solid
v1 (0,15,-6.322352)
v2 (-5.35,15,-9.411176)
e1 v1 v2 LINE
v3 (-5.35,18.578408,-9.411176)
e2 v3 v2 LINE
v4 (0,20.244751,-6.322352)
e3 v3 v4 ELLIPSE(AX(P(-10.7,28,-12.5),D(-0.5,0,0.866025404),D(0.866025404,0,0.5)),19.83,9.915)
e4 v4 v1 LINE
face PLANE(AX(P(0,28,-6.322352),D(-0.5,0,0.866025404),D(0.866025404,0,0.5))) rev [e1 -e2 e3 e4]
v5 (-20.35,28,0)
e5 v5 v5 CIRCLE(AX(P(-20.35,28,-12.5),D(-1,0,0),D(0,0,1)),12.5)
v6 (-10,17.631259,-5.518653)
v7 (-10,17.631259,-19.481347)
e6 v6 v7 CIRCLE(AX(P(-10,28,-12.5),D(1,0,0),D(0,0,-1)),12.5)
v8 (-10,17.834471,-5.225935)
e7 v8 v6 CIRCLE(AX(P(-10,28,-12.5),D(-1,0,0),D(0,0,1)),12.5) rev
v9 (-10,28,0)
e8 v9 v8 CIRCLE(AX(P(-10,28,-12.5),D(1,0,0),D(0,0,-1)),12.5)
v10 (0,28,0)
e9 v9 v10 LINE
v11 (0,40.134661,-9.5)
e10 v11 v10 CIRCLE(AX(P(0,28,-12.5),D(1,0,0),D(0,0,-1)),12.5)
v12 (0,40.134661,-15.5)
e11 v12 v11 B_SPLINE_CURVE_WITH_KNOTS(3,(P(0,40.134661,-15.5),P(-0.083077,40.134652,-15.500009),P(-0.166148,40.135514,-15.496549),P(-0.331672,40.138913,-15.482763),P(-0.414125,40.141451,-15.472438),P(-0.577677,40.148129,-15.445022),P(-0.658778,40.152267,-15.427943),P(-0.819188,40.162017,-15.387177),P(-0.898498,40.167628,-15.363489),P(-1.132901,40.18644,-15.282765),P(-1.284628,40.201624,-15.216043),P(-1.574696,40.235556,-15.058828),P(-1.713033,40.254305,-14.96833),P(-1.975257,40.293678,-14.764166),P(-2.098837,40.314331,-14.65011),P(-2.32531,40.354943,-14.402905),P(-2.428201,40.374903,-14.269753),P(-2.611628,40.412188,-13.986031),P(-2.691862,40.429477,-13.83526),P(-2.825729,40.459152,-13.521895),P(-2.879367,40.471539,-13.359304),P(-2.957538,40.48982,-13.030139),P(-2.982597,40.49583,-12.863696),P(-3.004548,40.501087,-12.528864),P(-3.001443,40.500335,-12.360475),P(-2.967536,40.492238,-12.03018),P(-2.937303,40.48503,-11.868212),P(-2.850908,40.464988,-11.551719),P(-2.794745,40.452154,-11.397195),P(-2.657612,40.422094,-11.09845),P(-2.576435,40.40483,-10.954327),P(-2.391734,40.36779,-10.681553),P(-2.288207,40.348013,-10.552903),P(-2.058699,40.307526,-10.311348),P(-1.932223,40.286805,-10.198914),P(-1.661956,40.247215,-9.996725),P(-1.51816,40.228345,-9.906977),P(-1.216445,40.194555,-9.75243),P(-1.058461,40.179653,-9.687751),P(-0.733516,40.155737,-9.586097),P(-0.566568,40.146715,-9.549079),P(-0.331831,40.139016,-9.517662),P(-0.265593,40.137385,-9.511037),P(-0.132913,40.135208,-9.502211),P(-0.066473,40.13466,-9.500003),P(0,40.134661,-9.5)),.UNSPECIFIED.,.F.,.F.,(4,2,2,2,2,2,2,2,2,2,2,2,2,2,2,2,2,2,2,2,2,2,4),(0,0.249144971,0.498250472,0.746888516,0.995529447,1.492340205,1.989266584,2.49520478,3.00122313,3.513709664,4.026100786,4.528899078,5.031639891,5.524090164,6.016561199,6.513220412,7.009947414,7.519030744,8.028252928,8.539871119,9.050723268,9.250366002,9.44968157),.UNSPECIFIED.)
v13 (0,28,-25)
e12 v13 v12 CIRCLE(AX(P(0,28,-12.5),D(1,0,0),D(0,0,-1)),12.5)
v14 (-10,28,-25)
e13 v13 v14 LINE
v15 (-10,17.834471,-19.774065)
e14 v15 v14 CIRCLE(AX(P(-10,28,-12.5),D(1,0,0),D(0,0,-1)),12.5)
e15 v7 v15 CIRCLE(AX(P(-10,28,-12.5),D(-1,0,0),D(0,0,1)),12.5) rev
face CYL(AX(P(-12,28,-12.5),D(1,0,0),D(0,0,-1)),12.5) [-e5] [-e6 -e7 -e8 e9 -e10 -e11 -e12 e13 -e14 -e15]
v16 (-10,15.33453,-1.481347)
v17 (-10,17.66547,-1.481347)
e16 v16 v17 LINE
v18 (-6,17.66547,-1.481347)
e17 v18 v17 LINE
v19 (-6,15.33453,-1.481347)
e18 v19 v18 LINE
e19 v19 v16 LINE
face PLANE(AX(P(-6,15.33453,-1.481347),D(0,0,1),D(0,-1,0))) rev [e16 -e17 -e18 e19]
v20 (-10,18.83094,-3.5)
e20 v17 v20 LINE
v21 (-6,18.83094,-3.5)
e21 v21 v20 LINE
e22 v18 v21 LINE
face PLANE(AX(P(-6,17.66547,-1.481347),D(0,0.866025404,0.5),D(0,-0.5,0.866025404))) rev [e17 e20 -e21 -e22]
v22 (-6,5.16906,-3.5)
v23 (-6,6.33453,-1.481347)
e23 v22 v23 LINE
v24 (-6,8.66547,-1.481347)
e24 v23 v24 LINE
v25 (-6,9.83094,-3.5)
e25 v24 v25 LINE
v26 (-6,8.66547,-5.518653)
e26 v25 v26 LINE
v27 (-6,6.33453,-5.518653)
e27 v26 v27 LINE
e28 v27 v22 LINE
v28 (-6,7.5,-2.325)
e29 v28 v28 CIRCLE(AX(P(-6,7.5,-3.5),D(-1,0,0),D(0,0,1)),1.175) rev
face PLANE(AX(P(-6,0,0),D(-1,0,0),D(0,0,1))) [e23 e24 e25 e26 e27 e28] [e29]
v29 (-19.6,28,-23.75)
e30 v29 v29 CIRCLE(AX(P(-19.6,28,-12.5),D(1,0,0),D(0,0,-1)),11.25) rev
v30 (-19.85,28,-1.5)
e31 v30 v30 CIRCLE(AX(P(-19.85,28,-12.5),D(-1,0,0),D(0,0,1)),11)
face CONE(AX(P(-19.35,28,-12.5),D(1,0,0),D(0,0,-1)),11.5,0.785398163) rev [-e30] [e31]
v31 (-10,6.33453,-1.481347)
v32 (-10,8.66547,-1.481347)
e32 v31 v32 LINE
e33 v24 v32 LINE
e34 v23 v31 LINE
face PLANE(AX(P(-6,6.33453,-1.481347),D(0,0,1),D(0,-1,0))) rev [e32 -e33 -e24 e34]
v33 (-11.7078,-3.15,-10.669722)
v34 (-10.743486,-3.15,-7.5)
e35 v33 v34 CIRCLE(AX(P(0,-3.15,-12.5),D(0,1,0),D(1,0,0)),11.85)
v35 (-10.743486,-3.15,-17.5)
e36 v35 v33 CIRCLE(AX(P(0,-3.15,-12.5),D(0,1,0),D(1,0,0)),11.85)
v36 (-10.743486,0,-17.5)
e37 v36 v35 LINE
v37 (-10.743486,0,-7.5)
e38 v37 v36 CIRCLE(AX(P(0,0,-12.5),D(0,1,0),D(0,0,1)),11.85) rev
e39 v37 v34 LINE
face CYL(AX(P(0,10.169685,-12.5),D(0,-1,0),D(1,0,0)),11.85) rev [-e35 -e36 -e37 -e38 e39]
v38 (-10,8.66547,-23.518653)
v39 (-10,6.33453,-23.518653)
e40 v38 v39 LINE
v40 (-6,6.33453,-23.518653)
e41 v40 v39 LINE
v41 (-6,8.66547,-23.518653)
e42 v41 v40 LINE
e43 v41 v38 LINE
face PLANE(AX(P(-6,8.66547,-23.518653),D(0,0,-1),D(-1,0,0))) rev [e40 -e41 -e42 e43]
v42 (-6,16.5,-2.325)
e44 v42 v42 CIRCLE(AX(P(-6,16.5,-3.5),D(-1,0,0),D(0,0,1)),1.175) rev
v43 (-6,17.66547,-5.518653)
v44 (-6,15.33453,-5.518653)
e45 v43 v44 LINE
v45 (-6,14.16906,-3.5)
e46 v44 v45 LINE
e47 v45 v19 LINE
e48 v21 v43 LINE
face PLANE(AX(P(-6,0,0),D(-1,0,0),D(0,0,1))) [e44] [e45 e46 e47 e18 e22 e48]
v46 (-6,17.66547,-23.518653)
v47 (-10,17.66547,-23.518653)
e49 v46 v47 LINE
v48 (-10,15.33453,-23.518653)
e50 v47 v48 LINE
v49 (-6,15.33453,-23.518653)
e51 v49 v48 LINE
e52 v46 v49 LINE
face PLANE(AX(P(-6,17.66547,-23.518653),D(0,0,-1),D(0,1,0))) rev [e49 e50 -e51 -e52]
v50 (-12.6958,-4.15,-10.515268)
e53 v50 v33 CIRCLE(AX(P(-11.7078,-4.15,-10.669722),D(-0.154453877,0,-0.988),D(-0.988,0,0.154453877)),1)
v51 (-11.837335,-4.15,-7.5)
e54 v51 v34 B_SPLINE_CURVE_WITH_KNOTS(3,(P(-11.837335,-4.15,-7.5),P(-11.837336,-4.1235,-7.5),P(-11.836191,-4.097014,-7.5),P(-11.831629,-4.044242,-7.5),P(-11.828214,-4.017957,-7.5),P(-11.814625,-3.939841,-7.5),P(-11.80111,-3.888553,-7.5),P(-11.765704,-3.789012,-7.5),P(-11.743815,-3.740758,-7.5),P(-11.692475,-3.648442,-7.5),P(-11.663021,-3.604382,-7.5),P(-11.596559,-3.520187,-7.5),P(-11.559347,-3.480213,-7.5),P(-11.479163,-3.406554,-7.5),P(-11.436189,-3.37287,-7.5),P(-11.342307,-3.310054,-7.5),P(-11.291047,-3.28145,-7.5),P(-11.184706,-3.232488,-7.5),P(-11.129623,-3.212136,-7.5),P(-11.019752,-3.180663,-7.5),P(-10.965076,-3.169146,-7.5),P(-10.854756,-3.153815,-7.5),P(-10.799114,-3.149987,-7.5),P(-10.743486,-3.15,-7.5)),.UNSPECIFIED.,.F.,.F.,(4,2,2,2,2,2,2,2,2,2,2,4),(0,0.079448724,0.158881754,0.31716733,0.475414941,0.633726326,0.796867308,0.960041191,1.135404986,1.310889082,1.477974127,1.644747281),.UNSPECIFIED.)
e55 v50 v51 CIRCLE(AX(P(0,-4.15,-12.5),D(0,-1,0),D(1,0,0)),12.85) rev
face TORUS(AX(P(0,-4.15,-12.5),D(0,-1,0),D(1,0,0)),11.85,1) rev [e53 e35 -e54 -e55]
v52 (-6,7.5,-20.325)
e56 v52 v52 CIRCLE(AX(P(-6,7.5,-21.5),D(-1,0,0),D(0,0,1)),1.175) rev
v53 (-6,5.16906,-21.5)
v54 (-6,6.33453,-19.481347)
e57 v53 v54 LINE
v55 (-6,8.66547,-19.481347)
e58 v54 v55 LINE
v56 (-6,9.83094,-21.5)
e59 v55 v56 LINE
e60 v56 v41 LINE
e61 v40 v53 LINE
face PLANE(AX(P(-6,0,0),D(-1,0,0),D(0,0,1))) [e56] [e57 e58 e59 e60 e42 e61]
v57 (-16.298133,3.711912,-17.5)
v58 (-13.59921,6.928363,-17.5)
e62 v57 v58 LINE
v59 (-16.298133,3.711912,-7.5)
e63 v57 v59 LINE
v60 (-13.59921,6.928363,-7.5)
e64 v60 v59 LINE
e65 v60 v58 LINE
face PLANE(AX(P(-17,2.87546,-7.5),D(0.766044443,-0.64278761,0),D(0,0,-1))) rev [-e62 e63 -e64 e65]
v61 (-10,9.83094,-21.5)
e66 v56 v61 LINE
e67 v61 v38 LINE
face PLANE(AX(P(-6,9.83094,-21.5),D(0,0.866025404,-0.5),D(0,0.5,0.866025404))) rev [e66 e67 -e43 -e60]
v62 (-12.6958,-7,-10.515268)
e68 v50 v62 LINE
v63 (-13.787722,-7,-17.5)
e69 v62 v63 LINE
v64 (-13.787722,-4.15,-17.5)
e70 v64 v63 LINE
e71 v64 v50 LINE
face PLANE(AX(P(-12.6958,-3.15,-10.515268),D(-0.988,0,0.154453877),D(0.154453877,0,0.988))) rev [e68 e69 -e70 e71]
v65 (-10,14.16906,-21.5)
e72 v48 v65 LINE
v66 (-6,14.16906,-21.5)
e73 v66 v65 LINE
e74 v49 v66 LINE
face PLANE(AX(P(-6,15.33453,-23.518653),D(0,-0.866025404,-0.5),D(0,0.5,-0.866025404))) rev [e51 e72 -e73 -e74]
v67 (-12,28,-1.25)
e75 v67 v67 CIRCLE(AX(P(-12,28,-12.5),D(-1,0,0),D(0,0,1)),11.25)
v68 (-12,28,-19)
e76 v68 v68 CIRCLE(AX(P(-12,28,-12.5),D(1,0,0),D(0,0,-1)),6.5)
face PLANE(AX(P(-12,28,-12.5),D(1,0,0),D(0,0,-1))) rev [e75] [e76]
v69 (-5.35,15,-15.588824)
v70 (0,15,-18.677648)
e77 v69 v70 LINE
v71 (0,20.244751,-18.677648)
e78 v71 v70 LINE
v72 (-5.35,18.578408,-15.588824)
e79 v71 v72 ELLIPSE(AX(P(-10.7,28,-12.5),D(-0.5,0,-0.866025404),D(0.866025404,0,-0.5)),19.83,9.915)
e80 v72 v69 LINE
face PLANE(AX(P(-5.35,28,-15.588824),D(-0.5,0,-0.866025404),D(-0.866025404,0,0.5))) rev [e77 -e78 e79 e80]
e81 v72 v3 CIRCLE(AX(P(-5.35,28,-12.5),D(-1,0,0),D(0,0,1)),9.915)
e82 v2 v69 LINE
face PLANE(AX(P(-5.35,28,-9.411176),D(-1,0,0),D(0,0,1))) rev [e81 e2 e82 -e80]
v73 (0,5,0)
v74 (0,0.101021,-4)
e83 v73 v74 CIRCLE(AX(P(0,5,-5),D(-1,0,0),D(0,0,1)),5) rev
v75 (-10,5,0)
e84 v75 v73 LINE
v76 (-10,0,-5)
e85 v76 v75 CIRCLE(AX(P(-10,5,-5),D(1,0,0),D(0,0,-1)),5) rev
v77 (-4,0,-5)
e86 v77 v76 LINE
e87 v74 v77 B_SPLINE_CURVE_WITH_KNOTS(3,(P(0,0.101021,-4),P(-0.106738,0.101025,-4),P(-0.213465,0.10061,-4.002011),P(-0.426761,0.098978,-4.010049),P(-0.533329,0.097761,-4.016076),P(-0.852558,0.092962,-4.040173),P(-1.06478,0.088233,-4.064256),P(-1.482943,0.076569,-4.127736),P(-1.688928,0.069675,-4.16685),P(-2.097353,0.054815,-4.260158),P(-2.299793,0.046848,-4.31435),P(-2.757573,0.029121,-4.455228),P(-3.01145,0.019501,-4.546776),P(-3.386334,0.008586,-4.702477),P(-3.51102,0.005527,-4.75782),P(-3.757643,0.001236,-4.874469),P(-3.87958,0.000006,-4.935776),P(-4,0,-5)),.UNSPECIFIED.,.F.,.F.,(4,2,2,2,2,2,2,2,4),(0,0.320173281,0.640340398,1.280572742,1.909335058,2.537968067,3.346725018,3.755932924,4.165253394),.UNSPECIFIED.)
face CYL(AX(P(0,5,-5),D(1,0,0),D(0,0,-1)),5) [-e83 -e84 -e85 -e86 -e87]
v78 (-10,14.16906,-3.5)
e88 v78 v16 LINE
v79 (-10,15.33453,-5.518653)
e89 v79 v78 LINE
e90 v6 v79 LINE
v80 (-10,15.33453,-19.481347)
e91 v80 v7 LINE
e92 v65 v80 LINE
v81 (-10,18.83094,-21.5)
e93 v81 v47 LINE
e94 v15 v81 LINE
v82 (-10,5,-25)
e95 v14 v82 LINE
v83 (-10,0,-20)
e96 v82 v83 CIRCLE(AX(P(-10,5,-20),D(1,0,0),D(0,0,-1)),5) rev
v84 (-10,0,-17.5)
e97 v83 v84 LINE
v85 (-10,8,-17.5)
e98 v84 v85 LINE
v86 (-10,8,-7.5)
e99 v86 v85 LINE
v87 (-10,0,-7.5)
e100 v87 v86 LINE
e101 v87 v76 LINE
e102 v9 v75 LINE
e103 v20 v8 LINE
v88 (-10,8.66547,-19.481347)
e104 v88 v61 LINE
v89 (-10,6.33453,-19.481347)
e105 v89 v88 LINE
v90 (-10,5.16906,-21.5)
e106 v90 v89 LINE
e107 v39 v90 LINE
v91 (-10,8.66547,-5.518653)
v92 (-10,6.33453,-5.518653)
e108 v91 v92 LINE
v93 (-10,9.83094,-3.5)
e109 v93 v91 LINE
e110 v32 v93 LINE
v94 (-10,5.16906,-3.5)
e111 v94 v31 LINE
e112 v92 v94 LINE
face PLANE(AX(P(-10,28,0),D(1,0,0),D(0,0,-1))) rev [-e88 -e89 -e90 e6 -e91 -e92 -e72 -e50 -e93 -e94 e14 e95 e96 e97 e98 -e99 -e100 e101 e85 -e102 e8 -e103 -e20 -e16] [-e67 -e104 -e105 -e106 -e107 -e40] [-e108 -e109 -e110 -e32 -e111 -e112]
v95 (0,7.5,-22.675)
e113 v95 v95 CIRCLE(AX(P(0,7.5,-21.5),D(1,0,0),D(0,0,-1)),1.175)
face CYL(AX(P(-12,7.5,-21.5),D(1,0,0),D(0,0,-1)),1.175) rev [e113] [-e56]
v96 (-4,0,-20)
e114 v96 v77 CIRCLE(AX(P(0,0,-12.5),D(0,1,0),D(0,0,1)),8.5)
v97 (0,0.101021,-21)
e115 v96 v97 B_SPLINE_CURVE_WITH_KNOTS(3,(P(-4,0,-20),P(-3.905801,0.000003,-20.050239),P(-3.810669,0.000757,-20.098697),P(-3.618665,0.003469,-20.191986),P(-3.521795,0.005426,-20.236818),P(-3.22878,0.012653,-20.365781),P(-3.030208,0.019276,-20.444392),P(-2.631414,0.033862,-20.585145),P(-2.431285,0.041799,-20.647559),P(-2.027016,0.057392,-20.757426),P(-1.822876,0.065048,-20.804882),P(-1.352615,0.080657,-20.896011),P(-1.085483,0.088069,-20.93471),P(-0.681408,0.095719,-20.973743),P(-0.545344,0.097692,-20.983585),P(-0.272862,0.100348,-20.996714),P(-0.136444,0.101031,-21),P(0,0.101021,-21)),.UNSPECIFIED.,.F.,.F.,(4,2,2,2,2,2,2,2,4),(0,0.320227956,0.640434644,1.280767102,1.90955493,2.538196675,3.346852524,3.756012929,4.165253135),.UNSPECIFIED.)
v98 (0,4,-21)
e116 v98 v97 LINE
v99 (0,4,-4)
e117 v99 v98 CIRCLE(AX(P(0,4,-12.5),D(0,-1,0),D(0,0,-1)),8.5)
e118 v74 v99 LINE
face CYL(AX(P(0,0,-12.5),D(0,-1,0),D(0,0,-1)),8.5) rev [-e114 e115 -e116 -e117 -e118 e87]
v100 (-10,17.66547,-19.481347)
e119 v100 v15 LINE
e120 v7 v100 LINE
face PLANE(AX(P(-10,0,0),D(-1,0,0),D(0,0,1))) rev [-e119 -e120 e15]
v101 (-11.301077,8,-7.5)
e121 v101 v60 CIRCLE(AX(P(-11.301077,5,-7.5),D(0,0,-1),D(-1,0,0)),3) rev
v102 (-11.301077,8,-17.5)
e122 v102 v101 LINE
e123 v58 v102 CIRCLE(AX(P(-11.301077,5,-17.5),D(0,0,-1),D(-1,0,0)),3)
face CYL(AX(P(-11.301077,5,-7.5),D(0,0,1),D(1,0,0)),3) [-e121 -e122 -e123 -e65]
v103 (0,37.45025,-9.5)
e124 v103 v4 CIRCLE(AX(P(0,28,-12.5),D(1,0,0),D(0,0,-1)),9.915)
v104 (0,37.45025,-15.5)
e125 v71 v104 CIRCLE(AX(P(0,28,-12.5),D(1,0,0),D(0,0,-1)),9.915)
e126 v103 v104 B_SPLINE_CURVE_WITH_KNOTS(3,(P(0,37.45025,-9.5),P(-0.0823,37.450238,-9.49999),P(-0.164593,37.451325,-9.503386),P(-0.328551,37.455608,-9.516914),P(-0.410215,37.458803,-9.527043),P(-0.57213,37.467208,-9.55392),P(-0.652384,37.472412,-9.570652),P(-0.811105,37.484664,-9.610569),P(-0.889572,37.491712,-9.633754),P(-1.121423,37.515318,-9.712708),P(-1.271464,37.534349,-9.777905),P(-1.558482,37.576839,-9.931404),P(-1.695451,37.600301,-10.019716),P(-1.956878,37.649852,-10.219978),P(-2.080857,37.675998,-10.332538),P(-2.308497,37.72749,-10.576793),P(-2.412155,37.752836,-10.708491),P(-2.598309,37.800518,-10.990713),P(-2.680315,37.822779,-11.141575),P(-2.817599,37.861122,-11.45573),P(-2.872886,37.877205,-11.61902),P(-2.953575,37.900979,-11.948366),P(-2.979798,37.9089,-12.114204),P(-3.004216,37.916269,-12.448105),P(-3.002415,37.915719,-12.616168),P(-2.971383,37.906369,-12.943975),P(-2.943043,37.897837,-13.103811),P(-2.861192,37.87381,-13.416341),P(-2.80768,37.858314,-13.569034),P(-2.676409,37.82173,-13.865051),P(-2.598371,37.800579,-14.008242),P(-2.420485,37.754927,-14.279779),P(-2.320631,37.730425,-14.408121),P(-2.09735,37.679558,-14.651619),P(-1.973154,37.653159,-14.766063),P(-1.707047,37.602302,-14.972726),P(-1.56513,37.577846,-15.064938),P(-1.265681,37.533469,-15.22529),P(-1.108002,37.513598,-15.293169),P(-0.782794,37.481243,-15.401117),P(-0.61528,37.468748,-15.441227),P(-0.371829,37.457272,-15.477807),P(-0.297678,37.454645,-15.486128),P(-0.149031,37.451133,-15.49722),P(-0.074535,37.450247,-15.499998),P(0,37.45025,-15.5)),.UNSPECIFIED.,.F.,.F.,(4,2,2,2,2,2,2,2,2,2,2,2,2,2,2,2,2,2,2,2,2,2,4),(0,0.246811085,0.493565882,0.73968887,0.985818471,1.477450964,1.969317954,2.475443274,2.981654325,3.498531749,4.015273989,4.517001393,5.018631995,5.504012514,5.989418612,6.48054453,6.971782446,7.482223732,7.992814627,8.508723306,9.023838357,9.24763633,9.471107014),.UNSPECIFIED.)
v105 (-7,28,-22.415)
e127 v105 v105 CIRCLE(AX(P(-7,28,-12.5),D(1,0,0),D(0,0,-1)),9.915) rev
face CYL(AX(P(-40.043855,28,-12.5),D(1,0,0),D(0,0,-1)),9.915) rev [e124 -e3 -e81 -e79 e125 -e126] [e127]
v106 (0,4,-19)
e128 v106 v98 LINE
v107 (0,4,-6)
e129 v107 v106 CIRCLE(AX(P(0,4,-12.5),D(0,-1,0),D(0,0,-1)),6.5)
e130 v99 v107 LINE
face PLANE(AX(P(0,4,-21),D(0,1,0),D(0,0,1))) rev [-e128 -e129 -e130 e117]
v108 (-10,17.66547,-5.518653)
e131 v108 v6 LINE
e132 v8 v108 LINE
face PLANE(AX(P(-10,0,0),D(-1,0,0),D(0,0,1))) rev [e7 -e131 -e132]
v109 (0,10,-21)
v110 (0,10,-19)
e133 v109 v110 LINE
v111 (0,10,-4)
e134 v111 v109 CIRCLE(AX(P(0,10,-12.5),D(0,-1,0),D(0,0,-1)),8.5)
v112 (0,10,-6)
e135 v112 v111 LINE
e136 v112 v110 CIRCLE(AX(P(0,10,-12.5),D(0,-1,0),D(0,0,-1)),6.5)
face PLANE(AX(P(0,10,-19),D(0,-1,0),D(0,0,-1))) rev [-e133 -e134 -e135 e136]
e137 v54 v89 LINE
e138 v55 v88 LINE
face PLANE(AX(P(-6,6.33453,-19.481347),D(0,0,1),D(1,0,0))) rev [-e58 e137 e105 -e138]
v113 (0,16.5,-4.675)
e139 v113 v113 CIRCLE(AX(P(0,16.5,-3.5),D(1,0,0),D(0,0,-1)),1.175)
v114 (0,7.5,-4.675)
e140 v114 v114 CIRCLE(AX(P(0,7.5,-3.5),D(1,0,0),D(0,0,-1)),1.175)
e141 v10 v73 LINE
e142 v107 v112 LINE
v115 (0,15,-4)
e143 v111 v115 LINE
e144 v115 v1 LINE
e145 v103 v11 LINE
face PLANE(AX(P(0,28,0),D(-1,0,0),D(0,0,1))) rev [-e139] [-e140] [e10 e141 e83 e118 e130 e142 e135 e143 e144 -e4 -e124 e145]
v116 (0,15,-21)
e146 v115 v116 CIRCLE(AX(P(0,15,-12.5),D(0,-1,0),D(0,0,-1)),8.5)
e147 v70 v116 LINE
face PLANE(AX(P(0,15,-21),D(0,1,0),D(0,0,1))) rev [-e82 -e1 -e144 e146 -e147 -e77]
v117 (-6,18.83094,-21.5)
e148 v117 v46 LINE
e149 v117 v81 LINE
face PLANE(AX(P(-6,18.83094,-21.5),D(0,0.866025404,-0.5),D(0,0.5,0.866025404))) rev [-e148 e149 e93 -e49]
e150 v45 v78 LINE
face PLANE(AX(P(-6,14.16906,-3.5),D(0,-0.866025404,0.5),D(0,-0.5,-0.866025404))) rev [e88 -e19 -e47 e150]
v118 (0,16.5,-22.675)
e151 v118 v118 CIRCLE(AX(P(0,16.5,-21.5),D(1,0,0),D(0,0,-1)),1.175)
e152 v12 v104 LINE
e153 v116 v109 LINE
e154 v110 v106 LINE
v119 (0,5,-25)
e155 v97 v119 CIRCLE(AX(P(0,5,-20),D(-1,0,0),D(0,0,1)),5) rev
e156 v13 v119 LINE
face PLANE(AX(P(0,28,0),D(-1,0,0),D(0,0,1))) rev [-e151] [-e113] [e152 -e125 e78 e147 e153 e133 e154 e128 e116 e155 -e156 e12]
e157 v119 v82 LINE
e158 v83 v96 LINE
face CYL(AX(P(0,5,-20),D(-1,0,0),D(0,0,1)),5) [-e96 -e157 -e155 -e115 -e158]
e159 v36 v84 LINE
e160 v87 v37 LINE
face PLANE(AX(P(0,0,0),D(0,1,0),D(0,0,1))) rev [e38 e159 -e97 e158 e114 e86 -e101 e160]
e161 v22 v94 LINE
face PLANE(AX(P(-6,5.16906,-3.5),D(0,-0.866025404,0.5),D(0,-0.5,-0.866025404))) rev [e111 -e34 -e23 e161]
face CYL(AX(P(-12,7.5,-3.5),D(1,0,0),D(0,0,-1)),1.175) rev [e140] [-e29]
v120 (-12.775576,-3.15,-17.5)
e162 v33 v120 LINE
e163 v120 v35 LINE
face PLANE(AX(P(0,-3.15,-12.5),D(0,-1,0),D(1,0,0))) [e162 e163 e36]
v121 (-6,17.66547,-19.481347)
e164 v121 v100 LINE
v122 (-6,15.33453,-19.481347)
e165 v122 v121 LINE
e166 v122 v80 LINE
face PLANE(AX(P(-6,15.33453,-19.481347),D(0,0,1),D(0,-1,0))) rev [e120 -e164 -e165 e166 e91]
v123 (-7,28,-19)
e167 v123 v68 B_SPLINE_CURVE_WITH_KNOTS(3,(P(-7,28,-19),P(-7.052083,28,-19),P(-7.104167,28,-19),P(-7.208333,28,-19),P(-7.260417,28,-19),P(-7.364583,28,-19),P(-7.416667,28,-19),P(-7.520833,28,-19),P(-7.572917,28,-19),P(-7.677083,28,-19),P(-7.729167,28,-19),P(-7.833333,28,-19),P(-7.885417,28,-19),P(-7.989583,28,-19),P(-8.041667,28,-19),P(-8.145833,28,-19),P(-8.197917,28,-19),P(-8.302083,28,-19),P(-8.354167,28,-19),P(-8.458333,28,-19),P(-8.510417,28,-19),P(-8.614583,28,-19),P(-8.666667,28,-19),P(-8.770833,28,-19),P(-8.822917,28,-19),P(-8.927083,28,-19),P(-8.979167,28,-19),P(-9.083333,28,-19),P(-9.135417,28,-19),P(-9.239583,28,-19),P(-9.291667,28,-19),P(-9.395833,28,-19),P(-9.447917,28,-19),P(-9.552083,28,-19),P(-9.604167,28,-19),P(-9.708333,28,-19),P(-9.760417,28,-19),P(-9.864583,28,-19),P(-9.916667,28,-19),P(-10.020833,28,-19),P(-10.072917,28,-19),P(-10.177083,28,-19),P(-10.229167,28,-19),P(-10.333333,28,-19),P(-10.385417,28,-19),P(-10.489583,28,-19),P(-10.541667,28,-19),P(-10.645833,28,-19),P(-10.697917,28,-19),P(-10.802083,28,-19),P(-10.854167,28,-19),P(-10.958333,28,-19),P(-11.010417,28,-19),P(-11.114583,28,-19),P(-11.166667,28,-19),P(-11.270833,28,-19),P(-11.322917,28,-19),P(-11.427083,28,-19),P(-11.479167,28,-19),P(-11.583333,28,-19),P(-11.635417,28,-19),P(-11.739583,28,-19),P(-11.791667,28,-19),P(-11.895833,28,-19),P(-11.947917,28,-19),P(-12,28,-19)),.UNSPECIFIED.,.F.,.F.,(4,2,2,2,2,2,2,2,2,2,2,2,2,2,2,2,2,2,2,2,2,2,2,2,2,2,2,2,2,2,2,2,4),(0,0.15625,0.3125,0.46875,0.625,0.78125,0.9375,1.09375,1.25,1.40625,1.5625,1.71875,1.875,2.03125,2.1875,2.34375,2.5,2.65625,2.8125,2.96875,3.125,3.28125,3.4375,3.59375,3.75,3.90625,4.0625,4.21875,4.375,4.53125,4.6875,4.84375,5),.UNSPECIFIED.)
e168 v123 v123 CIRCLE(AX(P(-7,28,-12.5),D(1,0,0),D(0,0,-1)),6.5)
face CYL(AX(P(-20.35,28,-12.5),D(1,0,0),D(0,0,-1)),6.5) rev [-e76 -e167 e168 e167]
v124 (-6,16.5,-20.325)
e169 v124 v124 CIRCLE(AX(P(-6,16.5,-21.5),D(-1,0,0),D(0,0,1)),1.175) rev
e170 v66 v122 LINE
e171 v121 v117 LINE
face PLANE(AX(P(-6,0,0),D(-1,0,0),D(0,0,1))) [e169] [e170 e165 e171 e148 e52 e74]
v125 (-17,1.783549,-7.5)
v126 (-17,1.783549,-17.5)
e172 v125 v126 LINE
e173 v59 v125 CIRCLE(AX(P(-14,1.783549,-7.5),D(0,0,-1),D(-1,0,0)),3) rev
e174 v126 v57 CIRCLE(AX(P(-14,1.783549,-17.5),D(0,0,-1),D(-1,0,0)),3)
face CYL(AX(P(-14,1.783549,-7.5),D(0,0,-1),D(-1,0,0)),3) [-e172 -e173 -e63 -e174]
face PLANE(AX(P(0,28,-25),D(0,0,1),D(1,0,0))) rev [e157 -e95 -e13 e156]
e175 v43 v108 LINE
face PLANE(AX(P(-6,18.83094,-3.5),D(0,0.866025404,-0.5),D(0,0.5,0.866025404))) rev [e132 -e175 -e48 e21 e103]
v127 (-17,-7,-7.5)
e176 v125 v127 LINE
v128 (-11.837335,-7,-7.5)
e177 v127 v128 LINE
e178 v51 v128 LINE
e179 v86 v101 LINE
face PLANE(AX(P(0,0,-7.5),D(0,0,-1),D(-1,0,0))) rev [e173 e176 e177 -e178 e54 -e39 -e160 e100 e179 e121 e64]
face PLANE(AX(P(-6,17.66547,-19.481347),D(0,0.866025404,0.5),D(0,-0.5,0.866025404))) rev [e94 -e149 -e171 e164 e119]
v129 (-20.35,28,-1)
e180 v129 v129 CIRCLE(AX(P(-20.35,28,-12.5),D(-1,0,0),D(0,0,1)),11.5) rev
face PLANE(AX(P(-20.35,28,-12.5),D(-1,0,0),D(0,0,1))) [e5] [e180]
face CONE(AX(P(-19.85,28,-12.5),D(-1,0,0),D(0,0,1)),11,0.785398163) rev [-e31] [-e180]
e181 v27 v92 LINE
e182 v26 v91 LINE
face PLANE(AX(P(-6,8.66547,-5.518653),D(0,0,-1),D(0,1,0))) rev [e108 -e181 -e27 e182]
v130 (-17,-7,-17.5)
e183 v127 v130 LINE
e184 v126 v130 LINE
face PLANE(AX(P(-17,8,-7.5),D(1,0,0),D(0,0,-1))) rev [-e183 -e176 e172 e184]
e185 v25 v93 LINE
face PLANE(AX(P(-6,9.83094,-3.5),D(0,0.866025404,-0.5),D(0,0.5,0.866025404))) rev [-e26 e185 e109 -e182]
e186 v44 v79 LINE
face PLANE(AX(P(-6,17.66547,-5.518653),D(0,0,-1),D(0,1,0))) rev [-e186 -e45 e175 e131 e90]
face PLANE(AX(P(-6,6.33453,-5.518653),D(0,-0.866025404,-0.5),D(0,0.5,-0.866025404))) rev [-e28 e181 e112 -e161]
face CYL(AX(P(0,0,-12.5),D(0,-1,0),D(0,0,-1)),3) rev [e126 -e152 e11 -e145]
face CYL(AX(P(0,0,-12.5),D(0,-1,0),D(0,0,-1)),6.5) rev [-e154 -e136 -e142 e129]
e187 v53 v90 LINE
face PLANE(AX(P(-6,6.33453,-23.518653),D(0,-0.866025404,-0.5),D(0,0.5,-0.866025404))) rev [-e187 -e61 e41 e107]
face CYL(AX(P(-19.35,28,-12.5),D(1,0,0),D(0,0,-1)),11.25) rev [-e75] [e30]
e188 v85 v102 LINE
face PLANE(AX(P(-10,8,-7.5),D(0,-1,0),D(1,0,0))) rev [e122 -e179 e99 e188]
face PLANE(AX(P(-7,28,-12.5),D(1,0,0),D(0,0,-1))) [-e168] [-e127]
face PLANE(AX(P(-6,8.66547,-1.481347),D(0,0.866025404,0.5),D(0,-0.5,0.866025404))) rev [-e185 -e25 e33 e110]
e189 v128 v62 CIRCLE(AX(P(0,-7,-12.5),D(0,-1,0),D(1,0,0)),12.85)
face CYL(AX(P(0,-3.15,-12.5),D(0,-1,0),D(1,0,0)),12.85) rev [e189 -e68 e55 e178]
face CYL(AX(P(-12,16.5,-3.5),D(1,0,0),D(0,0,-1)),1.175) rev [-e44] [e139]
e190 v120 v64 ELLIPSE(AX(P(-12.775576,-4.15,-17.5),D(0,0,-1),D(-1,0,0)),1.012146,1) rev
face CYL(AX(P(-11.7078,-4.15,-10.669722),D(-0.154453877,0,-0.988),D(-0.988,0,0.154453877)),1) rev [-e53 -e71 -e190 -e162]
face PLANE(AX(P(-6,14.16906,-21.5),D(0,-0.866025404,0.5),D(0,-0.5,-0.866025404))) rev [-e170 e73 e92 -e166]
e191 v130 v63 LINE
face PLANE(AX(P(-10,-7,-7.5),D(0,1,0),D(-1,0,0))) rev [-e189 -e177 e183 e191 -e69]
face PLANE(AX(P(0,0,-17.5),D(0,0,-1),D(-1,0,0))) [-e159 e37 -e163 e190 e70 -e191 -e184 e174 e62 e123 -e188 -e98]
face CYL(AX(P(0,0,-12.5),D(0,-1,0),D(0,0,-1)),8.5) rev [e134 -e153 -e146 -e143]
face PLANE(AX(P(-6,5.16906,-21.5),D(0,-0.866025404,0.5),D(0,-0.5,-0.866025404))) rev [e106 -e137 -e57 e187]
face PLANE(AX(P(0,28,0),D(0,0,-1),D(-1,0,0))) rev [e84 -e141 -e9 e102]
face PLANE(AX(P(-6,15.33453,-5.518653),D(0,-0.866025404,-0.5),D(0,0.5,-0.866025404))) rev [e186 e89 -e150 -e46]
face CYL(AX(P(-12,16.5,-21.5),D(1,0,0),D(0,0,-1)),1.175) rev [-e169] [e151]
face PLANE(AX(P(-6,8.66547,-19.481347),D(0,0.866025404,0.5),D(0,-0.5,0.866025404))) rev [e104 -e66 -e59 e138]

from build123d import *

# Parameters (mm, degrees)
CROQUIS1_W              = 10
CROQUIS1_H              = 25
SALIENTE_EXTRUIR1_DEPTH = 28
CROQUIS2_R              = 12.5
SALIENTE_EXTRUIR2_DEPTH = 12
REDONDEO1_R             = 5
CORTAR_EXTRUIR1_DEPTH   = 13
CROQUIS5_R              = 9.915
CORTAR_EXTRUIR2_DEPTH   = 7
CROQUIS8_R              = 1.175
CORTAR_EXTRUIR5_DEPTH   = 50.08411164
CROQUIS10_W             = 7
CROQUIS10_H             = 15
SALIENTE_EXTRUIR3_DEPTH = 5
CORTAR_EXTRUIR6_DEPTH   = 7
CORTAR_EXTRUIR7_DEPTH   = 3.85
CHAFL_N1_SIZE           = 4.3
CHAFL_N1_SIZE2          = 5.124540448
REDONDEO2_R             = 1
CORTAR_EXTRUIR8_DEPTH   = 4
REDONDEO3_R             = 3
CROQUIS14_R             = 12.5
CROQUIS14_R_2           = 11.25
SALIENTE_EXTRUIR4_DEPTH = 7.35
CROQUIS15_R             = 12.5
CROQUIS15_R_2           = 11
SALIENTE_EXTRUIR5_DEPTH = 1
CHAFL_N2_SIZE           = 0.5
CHAFL_N3_SIZE           = 0.5
CROQUIS16_R             = 6.5
CORTAR_EXTRUIR9_DEPTH   = 50.43149313


# Some blends are built 0.0001 mm under size
with BuildPart() as part:
    # Croquis1 → Saliente-Extruir1 (new body)
    with BuildSketch(Plane(origin=(0, 0, 0), x_dir=(1, 0, 0), z_dir=(0, 1, 0))):
        with Locations((-5, 12.5)):
            Rectangle(CROQUIS1_W, CROQUIS1_H)
    extrude(amount=SALIENTE_EXTRUIR1_DEPTH)

    # Croquis2 → Saliente-Extruir2 (add)
    with BuildSketch(Plane(origin=(0, 0, 0), x_dir=(0, 0, -1), z_dir=(1, 0, 0))):
        with Locations((12.5, 28)):
            Circle(CROQUIS2_R)
    extrude(amount=-SALIENTE_EXTRUIR2_DEPTH)

    # Croquis3 → Cortar-Revolución1 (revolve, cut)
    with BuildSketch(Plane(origin=(0, 0, 0), x_dir=(0, 0, -1), z_dir=(1, 0, 0))):
        Polygon((21, 0.5), (21, 4), (19, 4), (19, 10), (21, 10), (21, 15), (15.5, 15), (15.5, 41), (12.5, 41), (12.5, 0), (21, 0), align=None)
    revolve(axis=Axis((0, 0, -12.5), (0, 1, 0)), mode=Mode.SUBTRACT)

    # Redondeo1
    redondeo1_edges = [part.edges().sort_by_distance(p)[0] for p in [
        (-5, 0, -25),
        (-5, 0, 0),
    ]]
    fillet(redondeo1_edges, radius=REDONDEO1_R)

    # Croquis4 → Cortar-Extruir1 (cut)
    with BuildSketch(Plane.XZ.offset(-15)):
        Polygon((0, -18.67764788), (5.35, -15.58882394), (5.35, -9.41117606), (0, -6.32235212), (-5.35, -9.41117606), (-5.35, -15.58882394), align=None)
    extrude(amount=-CORTAR_EXTRUIR1_DEPTH, mode=Mode.SUBTRACT)

    # Croquis5 → Cortar-Extruir2 (cut)
    with BuildSketch(Plane(origin=(0, 0, 0), x_dir=(0, 0, -1), z_dir=(1, 0, 0))):
        with Locations((12.5, 28)):
            Circle(CROQUIS5_R)
    extrude(amount=-CORTAR_EXTRUIR2_DEPTH, mode=Mode.SUBTRACT)

    # Croquis8 → Cortar-Extruir5 (cut, through all)
    with BuildSketch(Plane(origin=(0, 0, 0), x_dir=(0, 0, -1), z_dir=(1, 0, 0))):
        with Locations((21.5, 16.5)):
            Circle(CROQUIS8_R)
        with Locations((3.5, 16.5)):
            Circle(CROQUIS8_R)
        with Locations((3.5, 7.5)):
            Circle(CROQUIS8_R)
        with Locations((21.5, 7.5)):
            Circle(CROQUIS8_R)
    extrude(amount=-CORTAR_EXTRUIR5_DEPTH, mode=Mode.SUBTRACT)

    # Croquis10 → Saliente-Extruir3 (add, symmetric)
    with BuildSketch(Plane.XY.offset(-12.5)):
        with Locations((-13.5, 0.5)):
            Rectangle(CROQUIS10_W, CROQUIS10_H)
    extrude(amount=SALIENTE_EXTRUIR3_DEPTH, both=True)

    # Croquis11 → Cortar-Extruir6 (cut)
    with BuildSketch(Plane.XZ.offset(7)):
        with BuildLine():
            Line((-10.743486399, -17.5), (-10, -17.5))
            Line((-10, -17.5), (-10, -7.5))
            Line((-10, -7.5), (-10.743486399, -7.5))
            ThreePointArc((-10.743486399, -7.5), (-11.85, -12.5), (-10.743486399, -17.5))
        make_face()
    extrude(amount=-CORTAR_EXTRUIR6_DEPTH, mode=Mode.SUBTRACT)

    # Croquis12 → Cortar-Extruir7 (cut)
    with BuildSketch(Plane.XZ.offset(7)):
        with BuildLine():
            Line((-13.787722048, -17.5), (-10.743486399, -17.5))
            ThreePointArc((-10.743486399, -17.5), (-11.85, -12.5), (-10.743486399, -7.5))
            Line((-10.743486399, -7.5), (-11.837335004, -7.5))
            ThreePointArc((-11.837335004, -7.5), (-12.358868803, -8.981355103), (-12.6958, -10.515267686))
            Line((-12.6958, -10.515267686), (-13.787722048, -17.5))
        make_face()
    extrude(amount=-CORTAR_EXTRUIR7_DEPTH, mode=Mode.SUBTRACT)

    # Chaflán1
    chafl_n1_edges = [part.edges().sort_by_distance(p)[0] for p in [
        (-17, 8, -12.5),
    ]]
    chafl_n1_side = [part.faces().sort_by_distance(p)[0] for p in [
        (-13.5, 8, -12.5),
    ]]
    chamfer(chafl_n1_edges, length=CHAFL_N1_SIZE, length2=CHAFL_N1_SIZE2, reference=chafl_n1_side[0])

    # Redondeo2
    redondeo2_edges = [part.edges().sort_by_distance(p)[0] for p in [
        (-12.358868803, -3.15, -8.981355103),
        (-13.241761024, -3.15, -14.007633843),
    ]]
    fillet(redondeo2_edges, radius=REDONDEO2_R - 0.0001)  # a hair under: the kernel refuses the full size

    # Croquis13 → Cortar-Extruir8 (cut)
    with BuildSketch(Plane.ZY.offset(10)):
        Polygon((-21.5, 18.830940108), (-23.518653348, 17.665470054), (-23.518653348, 15.334529946), (-21.5, 14.169059892), (-19.481346652, 15.334529946), (-19.481346652, 17.665470054), align=None)
        Polygon((-3.5, 18.830940108), (-5.518653348, 17.665470054), (-5.518653348, 15.334529946), (-3.5, 14.169059892), (-1.481346652, 15.334529946), (-1.481346652, 17.665470054), align=None)
        Polygon((-3.5, 9.830940108), (-5.518653348, 8.665470054), (-5.518653348, 6.334529946), (-3.5, 5.169059892), (-1.481346652, 6.334529946), (-1.481346652, 8.665470054), align=None)
        Polygon((-21.5, 9.830940108), (-23.518653348, 8.665470054), (-23.518653348, 6.334529946), (-21.5, 5.169059892), (-19.481346652, 6.334529946), (-19.481346652, 8.665470054), align=None)
    extrude(amount=-CORTAR_EXTRUIR8_DEPTH, mode=Mode.SUBTRACT)

    # Redondeo3
    redondeo3_edges = [part.edges().sort_by_distance(p)[0] for p in [
        (-17, 2.875459552, -12.5),
        (-12.7, 8, -12.5),
    ]]
    fillet(redondeo3_edges, radius=REDONDEO3_R)

    # Croquis14 → Saliente-Extruir4 (add)
    with BuildSketch(Plane.ZY.offset(12)):
        with Locations((-12.5, 28)):
            Circle(CROQUIS14_R)
        with Locations((-12.5, 28)):
            Circle(CROQUIS14_R_2, mode=Mode.SUBTRACT)
    extrude(amount=SALIENTE_EXTRUIR4_DEPTH)

    # Croquis15 → Saliente-Extruir5 (add)
    with BuildSketch(Plane.ZY.offset(19.35)):
        with Locations((-12.5, 28)):
            Circle(CROQUIS15_R)
        with Locations((-12.5, 28)):
            Circle(CROQUIS15_R_2, mode=Mode.SUBTRACT)
    extrude(amount=SALIENTE_EXTRUIR5_DEPTH)

    # Chaflán2
    chafl_n2_edges = [part.edges().sort_by_distance(p)[0] for p in [
        (-20.35, 28, -23.5),
    ]]
    chamfer(chafl_n2_edges, length=CHAFL_N2_SIZE)

    # Chaflán3
    # the kernel refuses this chamfer: 0.5 mm, written as the material it takes off along each edge
    with BuildSketch(Plane(origin=(-19.35, 28, -12.5), x_dir=(0, 0, 1), z_dir=(0, -1, 0))) as chafl_n3_piece_1_section:
        Polygon((11, CHAFL_N3_SIZE), (11 + CHAFL_N3_SIZE, 0), (11, 0), align=None)
    chafl_n3_piece_1 = revolve(axis=Axis((-19.35, 28, -12.5), (-1, 0, 0)), mode=Mode.PRIVATE)
    chafl_n3_piece_1 = chafl_n3_piece_1 & Plane(origin=(-19.718458847, 28, -12.5), x_dir=(0, 0, 1), z_dir=(1, 0, 0)) * Cylinder(11.25, 46, mode=Mode.PRIVATE)
    add(chafl_n3_piece_1, mode=Mode.SUBTRACT)

    # Croquis16 → Cortar-Extruir9 (cut, through all)
    with BuildSketch(Plane(origin=(-7, 0, 0), x_dir=(0, 0, -1), z_dir=(1, 0, 0))):
        with Locations((12.5, 28)):
            Circle(CROQUIS16_R)
    extrude(amount=-CORTAR_EXTRUIR9_DEPTH, mode=Mode.SUBTRACT)


solid = part.part
